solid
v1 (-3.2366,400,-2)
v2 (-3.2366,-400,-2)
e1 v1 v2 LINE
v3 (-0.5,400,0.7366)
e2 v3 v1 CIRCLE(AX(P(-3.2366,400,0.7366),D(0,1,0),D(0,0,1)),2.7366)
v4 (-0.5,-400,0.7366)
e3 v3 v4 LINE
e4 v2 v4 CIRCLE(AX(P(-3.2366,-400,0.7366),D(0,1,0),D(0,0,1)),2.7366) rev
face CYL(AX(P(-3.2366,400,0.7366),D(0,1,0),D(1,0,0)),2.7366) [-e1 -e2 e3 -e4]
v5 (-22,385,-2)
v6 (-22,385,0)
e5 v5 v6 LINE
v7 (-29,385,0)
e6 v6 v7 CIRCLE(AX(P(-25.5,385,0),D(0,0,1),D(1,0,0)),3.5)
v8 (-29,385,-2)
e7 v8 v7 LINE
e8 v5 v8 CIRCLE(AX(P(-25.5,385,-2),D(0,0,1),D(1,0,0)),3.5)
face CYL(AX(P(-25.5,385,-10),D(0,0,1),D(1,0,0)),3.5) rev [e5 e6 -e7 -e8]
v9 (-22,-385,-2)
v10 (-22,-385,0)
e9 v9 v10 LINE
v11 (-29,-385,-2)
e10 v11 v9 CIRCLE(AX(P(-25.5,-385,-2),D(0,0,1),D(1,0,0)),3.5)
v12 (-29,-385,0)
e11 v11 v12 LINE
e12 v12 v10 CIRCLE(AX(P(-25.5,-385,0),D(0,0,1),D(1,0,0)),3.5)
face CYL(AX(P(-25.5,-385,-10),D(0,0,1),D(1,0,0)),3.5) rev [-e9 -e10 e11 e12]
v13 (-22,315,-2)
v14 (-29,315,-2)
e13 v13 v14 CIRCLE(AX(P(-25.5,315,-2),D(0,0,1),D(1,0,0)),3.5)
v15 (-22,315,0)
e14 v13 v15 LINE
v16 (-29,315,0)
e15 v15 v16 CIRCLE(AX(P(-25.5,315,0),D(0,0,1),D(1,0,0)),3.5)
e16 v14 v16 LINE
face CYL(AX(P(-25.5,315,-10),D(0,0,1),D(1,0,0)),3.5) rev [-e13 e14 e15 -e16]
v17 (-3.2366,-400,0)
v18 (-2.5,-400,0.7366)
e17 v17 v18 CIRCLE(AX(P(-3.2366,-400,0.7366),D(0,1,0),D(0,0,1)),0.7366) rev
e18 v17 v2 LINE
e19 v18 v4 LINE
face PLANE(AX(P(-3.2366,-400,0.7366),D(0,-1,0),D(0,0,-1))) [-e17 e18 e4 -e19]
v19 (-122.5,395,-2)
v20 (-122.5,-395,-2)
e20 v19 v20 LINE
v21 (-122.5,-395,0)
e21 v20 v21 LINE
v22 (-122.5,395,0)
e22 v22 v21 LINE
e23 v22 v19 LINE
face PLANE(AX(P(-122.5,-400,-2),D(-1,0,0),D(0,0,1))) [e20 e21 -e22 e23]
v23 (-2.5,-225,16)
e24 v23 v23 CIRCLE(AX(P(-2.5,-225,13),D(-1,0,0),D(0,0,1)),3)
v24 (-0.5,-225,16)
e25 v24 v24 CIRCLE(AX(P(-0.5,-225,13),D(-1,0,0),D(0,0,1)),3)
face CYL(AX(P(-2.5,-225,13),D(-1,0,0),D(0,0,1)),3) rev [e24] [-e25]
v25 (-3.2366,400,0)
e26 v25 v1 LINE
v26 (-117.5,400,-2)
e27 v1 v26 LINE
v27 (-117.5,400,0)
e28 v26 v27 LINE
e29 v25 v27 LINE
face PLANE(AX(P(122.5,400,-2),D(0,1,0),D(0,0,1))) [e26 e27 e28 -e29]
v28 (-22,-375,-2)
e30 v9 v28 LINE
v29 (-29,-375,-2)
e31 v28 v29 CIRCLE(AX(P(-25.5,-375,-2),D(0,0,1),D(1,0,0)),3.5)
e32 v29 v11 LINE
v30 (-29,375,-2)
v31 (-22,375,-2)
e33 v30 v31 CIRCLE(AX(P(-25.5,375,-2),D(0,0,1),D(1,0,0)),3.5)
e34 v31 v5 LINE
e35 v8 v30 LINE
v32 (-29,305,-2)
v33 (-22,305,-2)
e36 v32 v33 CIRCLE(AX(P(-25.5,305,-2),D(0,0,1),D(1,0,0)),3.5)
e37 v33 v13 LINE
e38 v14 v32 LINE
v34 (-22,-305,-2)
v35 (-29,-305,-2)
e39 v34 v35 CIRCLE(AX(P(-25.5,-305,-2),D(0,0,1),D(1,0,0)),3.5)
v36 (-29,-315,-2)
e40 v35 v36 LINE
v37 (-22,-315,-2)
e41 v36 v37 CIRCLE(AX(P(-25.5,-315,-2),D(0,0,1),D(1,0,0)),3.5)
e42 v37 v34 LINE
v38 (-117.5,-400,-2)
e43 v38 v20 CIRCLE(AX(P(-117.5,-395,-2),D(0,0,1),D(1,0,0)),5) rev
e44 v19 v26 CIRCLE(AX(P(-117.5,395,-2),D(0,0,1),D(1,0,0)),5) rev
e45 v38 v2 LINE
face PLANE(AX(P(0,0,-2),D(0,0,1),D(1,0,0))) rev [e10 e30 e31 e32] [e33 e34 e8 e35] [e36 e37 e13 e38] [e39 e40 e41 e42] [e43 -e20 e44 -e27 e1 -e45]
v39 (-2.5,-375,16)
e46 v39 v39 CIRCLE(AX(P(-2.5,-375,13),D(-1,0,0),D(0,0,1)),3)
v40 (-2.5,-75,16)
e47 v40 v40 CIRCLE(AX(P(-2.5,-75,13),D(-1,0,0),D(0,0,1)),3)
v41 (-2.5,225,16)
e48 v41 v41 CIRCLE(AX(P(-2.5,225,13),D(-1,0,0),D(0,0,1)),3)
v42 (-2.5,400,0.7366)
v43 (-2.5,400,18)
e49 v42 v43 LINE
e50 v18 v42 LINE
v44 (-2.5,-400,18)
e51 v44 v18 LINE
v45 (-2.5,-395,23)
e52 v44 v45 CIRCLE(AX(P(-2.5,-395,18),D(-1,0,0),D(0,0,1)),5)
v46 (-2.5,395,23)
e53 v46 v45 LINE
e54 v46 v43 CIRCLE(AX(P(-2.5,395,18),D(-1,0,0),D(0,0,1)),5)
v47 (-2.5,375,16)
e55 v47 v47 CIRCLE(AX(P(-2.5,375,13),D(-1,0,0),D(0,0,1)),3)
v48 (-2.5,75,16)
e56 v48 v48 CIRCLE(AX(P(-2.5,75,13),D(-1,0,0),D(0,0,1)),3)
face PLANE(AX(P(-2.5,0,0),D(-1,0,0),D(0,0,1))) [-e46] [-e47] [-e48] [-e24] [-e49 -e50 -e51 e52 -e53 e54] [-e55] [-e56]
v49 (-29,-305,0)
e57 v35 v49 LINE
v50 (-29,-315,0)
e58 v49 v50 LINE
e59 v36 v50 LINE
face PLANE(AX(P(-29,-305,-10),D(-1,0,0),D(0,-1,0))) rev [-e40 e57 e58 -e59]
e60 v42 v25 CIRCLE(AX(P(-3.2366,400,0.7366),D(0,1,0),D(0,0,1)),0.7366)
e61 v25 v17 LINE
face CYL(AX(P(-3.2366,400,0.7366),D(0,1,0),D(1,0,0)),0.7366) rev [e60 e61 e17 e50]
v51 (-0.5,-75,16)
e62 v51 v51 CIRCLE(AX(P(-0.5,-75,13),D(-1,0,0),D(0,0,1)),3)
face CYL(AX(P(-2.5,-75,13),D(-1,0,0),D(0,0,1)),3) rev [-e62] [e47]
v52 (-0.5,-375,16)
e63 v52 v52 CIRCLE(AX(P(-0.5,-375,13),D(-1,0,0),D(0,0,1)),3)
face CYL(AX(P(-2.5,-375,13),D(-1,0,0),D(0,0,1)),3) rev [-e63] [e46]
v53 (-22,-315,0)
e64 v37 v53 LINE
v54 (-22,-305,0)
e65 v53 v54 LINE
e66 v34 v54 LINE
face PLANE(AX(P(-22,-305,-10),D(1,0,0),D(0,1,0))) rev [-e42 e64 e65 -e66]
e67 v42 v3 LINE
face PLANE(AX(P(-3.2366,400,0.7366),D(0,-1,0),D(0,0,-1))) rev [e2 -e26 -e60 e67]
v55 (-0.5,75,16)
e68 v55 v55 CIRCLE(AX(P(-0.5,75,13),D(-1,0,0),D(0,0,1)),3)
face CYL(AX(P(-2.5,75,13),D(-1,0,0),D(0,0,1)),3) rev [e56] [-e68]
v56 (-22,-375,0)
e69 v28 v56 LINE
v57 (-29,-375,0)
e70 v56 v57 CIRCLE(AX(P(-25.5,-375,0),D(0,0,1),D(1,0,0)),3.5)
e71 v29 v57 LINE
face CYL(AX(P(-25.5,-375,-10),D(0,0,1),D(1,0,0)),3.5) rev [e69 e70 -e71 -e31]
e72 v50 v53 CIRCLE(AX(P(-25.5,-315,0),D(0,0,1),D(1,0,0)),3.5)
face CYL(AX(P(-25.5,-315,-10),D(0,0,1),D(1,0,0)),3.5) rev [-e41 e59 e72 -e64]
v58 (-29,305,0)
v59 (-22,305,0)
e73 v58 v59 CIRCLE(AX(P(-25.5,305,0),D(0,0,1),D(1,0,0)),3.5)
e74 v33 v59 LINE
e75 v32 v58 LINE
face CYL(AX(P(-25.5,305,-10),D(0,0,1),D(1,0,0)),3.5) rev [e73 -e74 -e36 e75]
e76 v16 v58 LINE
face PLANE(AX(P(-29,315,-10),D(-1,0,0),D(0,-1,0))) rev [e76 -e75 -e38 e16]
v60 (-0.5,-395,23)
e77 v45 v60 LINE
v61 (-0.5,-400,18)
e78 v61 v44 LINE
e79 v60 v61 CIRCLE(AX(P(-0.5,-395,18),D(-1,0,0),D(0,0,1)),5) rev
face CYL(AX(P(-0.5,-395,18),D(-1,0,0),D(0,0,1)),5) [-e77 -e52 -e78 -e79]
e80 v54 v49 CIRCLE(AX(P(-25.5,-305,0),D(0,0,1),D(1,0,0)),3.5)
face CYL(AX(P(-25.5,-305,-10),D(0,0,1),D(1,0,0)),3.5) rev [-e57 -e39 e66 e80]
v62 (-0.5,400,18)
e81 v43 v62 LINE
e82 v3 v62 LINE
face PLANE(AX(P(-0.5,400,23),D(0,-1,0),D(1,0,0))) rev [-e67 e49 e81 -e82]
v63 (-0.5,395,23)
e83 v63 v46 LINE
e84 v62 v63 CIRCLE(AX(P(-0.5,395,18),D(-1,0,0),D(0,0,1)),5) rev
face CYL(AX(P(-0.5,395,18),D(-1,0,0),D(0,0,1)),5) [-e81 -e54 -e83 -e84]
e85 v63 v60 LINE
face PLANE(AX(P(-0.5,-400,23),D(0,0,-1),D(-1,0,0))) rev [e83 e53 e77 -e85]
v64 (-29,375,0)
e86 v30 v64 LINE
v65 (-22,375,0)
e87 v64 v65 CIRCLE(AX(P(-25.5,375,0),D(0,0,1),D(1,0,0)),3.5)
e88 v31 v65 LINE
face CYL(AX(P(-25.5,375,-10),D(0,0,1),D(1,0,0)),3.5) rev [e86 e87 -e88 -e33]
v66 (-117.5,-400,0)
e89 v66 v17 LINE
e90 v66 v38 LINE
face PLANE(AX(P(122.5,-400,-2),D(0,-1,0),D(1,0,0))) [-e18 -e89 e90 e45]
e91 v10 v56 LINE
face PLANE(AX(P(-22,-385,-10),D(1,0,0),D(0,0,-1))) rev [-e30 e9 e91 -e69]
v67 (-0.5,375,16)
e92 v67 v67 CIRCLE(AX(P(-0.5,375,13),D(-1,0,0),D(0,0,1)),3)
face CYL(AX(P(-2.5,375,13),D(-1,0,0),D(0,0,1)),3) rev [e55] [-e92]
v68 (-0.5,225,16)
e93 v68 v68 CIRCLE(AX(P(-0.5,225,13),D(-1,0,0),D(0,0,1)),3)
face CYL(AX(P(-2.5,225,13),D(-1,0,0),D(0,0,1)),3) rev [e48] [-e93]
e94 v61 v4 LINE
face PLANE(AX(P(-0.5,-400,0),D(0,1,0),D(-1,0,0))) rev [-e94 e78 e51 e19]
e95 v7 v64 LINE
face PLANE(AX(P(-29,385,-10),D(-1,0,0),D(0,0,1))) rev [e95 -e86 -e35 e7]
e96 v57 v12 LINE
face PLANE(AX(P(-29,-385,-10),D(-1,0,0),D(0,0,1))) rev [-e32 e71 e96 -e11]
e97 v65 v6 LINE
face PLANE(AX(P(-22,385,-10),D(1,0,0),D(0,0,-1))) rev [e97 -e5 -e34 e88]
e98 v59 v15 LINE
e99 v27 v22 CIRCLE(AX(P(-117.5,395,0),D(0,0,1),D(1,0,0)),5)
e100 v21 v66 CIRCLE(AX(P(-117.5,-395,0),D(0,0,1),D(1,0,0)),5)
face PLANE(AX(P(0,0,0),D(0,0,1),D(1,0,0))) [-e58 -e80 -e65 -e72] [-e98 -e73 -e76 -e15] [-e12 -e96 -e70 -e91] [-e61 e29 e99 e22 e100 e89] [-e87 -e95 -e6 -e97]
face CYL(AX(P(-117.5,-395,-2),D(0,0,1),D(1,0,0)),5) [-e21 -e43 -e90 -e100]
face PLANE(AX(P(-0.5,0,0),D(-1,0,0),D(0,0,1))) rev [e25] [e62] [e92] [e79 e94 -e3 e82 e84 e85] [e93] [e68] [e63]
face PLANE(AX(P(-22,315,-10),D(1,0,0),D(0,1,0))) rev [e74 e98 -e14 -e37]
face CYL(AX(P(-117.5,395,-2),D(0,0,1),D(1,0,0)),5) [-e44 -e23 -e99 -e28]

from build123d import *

# Parameters (mm, degrees)
SKETCH_1_W                       = 245
SKETCH_1_H                       = 800
SM_BASE_FLANGE_1_DEPTH           = 2
FILLET_1_R                       = 5
SKETCH_2_W                       = 1
SKETCH_2_H                       = 854.013811654
CUT_EXTRUDE_1_DEPTH              = 10
SKETCH_3_W                       = 130
SKETCH_3_H                       = 800.320249097
CUT_EXTRUDE_2_DEPTH              = 10
SM_EDGE_FLANGE_1_STRIP_W         = 9.4732
SM_EDGE_FLANGE_1_STRIP_H         = 2
SM_EDGE_FLANGE_1_STRIP_CUT_DEPTH = 800
SM_EDGE_FLANGE_1_DEPTH           = 800
FILLET_2_R                       = 5
CUT_EXTRUDE_3_DEPTH              = 10
HOLE_WIZARD_6_0_6_1_D            = 6
PATTERN_LINEAR_1_COUNT           = 6
PATTERN_LINEAR_1_PITCH           = 150


# Sheet-metal steps are written as plain solids
with BuildPart() as part:
    # Sketch 1 → 基体-法兰1 (new body)
    with BuildSketch(Plane.XY):
        Rectangle(SKETCH_1_W, SKETCH_1_H)
    extrude(amount=-SM_BASE_FLANGE_1_DEPTH)

    # 圆角1
    fillet_1_edges = [part.edges().sort_by_distance(p)[0] for p in [
        (-122.5, 400, -1),
        (122.5, 400, -1),
        (122.5, -400, -1),
        (-122.5, -400, -1),
    ]]
    fillet(fillet_1_edges, radius=FILLET_1_R)

    # Sketch 2 → 切除-拉伸1 (cut)
    with BuildSketch(Plane.XY):
        Rectangle(SKETCH_2_W, SKETCH_2_H)
    extrude(amount=-CUT_EXTRUDE_1_DEPTH, mode=Mode.SUBTRACT)


with BuildPart() as cut_extrude_1_piece_1:
    # of the separate pieces the step leaves, piece 1, a body of its own (cut_extrude_1_pieces)
    add(part.part.solids().sort_by_distance((-0.5, -400, 0))[0])

    # 边线-法兰1 strip (across the edge) → 边线-法兰1 strip cut (cut)
    with BuildSketch(Plane(origin=(-0.5, -400, 0), x_dir=(-1, 0, 0), z_dir=(0, 1, 0))):
        with Locations((-2, -1)):
            Rectangle(SM_EDGE_FLANGE_1_STRIP_W, SM_EDGE_FLANGE_1_STRIP_H)
    extrude(amount=SM_EDGE_FLANGE_1_STRIP_CUT_DEPTH, mode=Mode.SUBTRACT)

    # 边线-法兰1 section (across the edge) → 边线-法兰1 (add)
    with BuildSketch(Plane(origin=(-0.5, -400, 0), x_dir=(-1, 0, 0), z_dir=(0, 1, 0))):
        with BuildLine():
            Line((0, 0.7366), (0, 23))
            Line((0, 23), (2, 23))
            Line((2, 23), (2, 0.7366))
            ThreePointArc((2, 0.7366), (2.215745145, 0.215745145), (2.7366, 0))
            Line((2.7366, 0), (2.7366, -2))
            ThreePointArc((2.7366, -2), (0.801531583, -1.198468417), (0, 0.7366))
        make_face()
    extrude(amount=SM_EDGE_FLANGE_1_DEPTH)

    # 圆角2
    fillet_2_edges = [cut_extrude_1_piece_1.edges().sort_by_distance(p)[0] for p in [
        (-1.5, -400, 23),
        (-1.5, 400, 23),
    ]]
    fillet(fillet_2_edges, radius=FILLET_2_R)

    # 草图9 → 切除-拉伸3 (cut)
    with BuildSketch(Plane.XY):
        with BuildLine():
            Line((-22, 385), (-22, 375))
            ThreePointArc((-22, 375), (-25.5, 371.5), (-29, 375))
            Line((-29, 375), (-29, 385))
            ThreePointArc((-29, 385), (-25.5, 388.5), (-22, 385))
        make_face()
        with BuildLine():
            Line((-22, 315), (-22, 305))
            ThreePointArc((-22, 305), (-25.5, 301.5), (-29, 305))
            Line((-29, 305), (-29, 315))
            ThreePointArc((-29, 315), (-25.5, 318.5), (-22, 315))
        make_face()
        with BuildLine():
            Line((-29, -385), (-29, -375))
            ThreePointArc((-29, -375), (-25.5, -371.5), (-22, -375))
            Line((-22, -375), (-22, -385))
            ThreePointArc((-22, -385), (-25.5, -388.5), (-29, -385))
        make_face()
        with BuildLine():
            Line((-22, -305), (-22, -315))
            ThreePointArc((-22, -315), (-25.5, -318.5), (-29, -315))
            Line((-29, -315), (-29, -305))
            ThreePointArc((-29, -305), (-25.5, -301.5), (-22, -305))
        make_face()
    extrude(amount=-CUT_EXTRUDE_3_DEPTH, mode=Mode.SUBTRACT)

    # Ø6.0 (6) 直径孔1 (through all)
    with Locations(Plane.ZY.offset(2.5)):
        with Locations((13, 375)):
            hole_wizard_6_0_6_1 = Hole(HOLE_WIZARD_6_0_6_1_D / 2)

    # 阵列(线性)1: Ø6.0 (6) 直径孔1 ×6
    with Locations(*[(0, -i * PATTERN_LINEAR_1_PITCH, 0) for i in range(1, PATTERN_LINEAR_1_COUNT)]):
        add(hole_wizard_6_0_6_1, mode=Mode.SUBTRACT)


with BuildPart() as cut_extrude_1_piece_2:
    # of the separate pieces the step leaves, piece 2, a body of its own (cut_extrude_1_pieces)
    add(part.part.solids().sort_by_distance((117.5, -400, 0))[0])

    # Sketch 3 → 切除-拉伸2 (cut)
    with BuildSketch(Plane.XY):
        with Locations((65.5, -0.160124549)):
            Rectangle(SKETCH_3_W, SKETCH_3_H)
    extrude(amount=-CUT_EXTRUDE_2_DEPTH, mode=Mode.SUBTRACT)


solid = cut_extrude_1_piece_1.part
